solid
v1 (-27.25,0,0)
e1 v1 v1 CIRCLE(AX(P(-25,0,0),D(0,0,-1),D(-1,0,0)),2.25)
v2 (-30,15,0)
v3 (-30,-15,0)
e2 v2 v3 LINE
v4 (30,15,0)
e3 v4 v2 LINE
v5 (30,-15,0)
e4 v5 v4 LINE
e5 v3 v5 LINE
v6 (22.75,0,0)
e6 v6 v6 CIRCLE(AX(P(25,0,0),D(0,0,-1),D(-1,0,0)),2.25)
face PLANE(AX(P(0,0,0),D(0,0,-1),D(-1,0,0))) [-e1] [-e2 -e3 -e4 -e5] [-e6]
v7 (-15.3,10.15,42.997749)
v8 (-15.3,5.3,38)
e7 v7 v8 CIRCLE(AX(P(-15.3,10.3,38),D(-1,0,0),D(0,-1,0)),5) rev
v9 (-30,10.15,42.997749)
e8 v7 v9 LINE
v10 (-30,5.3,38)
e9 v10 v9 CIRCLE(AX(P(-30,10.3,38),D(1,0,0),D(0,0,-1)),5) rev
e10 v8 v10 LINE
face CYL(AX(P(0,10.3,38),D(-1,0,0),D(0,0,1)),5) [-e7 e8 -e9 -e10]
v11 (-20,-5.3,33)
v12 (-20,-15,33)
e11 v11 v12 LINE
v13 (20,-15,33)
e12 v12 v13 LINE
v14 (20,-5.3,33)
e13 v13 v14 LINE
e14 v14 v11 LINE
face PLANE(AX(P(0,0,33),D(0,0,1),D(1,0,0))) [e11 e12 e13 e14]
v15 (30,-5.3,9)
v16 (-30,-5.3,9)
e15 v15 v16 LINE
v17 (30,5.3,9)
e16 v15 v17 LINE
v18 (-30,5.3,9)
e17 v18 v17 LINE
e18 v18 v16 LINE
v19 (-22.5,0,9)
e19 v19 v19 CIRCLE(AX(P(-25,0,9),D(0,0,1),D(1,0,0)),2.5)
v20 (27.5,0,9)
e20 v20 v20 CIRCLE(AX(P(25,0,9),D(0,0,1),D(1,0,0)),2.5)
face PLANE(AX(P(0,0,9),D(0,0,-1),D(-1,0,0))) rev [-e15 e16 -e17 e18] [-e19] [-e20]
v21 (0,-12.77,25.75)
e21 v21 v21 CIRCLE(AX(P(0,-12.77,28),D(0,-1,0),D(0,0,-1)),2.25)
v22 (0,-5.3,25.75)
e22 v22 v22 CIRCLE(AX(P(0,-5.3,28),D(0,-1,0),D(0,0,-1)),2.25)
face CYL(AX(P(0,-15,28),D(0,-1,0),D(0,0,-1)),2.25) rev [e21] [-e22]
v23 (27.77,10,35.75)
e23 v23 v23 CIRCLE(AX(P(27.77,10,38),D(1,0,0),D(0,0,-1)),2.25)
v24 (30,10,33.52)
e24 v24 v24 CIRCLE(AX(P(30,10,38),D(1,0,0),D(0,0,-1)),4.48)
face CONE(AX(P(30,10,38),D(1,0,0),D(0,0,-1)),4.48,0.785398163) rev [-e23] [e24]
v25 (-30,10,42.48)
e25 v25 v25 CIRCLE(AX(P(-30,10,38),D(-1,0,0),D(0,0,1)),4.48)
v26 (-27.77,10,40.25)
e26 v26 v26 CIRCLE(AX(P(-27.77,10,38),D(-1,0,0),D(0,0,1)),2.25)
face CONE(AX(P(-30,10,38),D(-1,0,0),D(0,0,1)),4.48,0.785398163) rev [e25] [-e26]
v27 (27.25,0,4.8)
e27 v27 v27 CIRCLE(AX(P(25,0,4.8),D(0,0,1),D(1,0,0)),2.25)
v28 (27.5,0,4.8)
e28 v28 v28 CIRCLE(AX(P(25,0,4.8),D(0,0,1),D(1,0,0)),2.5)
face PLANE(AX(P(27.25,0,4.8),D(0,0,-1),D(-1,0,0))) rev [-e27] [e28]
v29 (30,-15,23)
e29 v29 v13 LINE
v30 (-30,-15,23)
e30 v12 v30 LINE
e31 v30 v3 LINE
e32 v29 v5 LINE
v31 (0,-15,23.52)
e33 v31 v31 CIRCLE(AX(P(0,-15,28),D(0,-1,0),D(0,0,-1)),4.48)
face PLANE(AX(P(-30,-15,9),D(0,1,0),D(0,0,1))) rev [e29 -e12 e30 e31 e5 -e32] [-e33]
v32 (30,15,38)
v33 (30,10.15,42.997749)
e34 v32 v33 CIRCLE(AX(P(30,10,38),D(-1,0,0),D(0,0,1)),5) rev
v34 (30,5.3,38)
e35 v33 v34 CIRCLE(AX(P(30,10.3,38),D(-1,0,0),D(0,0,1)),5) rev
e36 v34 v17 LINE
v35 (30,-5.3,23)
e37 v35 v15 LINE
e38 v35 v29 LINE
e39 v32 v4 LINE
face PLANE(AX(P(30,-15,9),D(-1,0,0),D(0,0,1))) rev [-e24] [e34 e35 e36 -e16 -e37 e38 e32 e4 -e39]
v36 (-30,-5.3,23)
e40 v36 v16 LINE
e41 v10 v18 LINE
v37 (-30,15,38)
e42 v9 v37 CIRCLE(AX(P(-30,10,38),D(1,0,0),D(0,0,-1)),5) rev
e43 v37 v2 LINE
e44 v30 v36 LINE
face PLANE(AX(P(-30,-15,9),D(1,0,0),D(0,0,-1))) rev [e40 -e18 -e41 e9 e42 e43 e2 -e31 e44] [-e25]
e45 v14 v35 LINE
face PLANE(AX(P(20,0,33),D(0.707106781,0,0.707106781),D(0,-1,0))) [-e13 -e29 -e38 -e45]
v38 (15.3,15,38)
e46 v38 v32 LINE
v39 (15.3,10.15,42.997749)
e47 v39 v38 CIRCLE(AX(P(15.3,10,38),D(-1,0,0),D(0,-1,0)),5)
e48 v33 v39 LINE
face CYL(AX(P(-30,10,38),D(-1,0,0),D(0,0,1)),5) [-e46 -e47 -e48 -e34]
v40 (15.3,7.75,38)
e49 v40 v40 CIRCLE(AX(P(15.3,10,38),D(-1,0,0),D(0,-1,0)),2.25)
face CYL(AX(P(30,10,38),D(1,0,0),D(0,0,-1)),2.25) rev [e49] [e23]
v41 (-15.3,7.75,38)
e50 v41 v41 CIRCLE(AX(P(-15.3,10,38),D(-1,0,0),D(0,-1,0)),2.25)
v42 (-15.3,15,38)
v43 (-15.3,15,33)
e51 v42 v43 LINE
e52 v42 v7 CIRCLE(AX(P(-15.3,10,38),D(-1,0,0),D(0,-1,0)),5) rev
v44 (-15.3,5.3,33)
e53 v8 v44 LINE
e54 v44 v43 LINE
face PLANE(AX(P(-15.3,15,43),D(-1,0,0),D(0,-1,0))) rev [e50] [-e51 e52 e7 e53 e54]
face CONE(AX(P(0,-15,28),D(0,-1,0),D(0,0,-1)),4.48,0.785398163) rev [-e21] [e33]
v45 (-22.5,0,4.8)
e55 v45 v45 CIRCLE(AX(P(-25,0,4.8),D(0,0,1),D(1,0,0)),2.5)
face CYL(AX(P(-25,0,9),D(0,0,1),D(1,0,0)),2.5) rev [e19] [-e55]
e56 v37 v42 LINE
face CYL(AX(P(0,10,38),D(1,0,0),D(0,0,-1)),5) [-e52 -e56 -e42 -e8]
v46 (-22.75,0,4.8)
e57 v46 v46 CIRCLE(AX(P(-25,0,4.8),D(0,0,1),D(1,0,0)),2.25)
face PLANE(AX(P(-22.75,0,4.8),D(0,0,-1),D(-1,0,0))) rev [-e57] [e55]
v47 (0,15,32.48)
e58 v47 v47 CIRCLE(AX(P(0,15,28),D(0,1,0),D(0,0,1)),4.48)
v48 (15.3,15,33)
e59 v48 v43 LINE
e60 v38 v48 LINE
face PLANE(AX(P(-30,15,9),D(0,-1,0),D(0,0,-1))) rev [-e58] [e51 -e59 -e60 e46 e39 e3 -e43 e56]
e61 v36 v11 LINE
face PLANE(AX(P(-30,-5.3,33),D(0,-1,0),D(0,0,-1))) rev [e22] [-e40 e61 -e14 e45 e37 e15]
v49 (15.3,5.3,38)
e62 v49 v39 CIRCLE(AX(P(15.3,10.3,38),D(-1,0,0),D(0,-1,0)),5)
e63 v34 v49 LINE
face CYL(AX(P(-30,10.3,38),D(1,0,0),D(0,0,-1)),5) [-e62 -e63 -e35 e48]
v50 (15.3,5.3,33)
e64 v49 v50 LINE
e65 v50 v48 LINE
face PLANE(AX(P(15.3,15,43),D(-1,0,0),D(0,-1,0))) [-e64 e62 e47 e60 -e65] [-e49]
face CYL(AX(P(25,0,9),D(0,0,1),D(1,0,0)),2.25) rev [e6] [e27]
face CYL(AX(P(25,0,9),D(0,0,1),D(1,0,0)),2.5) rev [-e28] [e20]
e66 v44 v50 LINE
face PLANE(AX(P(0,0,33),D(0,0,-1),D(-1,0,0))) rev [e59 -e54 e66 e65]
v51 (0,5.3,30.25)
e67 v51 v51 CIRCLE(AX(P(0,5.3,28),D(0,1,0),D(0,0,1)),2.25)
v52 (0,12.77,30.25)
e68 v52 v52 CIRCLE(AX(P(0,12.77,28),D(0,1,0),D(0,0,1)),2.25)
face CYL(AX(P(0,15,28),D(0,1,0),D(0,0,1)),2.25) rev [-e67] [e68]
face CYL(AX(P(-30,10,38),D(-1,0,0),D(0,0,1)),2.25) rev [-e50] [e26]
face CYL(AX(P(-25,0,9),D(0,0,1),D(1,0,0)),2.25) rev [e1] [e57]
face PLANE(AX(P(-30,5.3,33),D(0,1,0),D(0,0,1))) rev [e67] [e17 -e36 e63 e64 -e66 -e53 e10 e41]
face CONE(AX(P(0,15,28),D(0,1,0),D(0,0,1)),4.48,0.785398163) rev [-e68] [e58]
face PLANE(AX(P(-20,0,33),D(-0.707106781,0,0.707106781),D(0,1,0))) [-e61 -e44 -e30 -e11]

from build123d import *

# Parameters (mm, degrees)
SKETCH1_W                               = 60
SKETCH1_H                               = 30
BOSS_EXTRUDE1_DEPTH                     = 9
SKETCH2_W                               = 60
SKETCH2_H                               = 9.7
BOSS_EXTRUDE2_DEPTH                     = 24
CHAMFER1_SIZE                           = 10
CSK_FOR_M4_SFHCS1_D                     = 4.5
CSK_FOR_M4_SFHCS1_DEPTH                 = 12
CSK_FOR_M4_SFHCS1_CSINK_D               = 8.96
CSK_FOR_M4_SFHCS1_CSINK_ANGLE           = 90
CSK_FOR_M4_SFHCS1_TIP                   = 1.351936393
CSK_FOR_M4_SFHCS3_D                     = 4.5
CSK_FOR_M4_SFHCS3_DEPTH                 = 12
CSK_FOR_M4_SFHCS3_CSINK_D               = 8.96
CSK_FOR_M4_SFHCS3_CSINK_ANGLE           = 90
CSK_FOR_M4_SFHCS3_TIP                   = 1.351936393
CBORE_FOR_M5_HEX_HEAD_BOLT2_D           = 4.5
CBORE_FOR_M5_HEX_HEAD_BOLT2_DEPTH       = 12
CBORE_FOR_M5_HEX_HEAD_BOLT2_CBORE_D     = 5
CBORE_FOR_M5_HEX_HEAD_BOLT2_CBORE_DEPTH = 4.2
CBORE_FOR_M5_HEX_HEAD_BOLT2_TIP         = 1.351936393
SKETCH9_W                               = 14.7
SKETCH9_H                               = 9.7
BOSS_EXTRUDE3_DEPTH                     = 10
CSK_FOR_M4_SFHCS2_D                     = 4.5
CSK_FOR_M4_SFHCS2_CSINK_D               = 8.96
CSK_FOR_M4_SFHCS2_CSINK_ANGLE           = 90
FILLET1_R                               = 5


with BuildPart() as part:
    # Sketch1 → Boss-Extrude1 (new body)
    with BuildSketch(Plane.XY):
        Rectangle(SKETCH1_W, SKETCH1_H)
    extrude(amount=BOSS_EXTRUDE1_DEPTH)

    # Sketch2 → Boss-Extrude2 (add)
    with BuildSketch(Plane.XY.offset(9)):
        with Locations((0, 10.15)):
            Rectangle(SKETCH2_W, SKETCH2_H)
        with Locations((0, -10.15)):
            Rectangle(SKETCH2_W, SKETCH2_H)
    extrude(amount=BOSS_EXTRUDE2_DEPTH)

    # Chamfer1
    chamfer1_edges = [part.edges().sort_by_distance(p)[0] for p in [
        (30, -10.15, 33),
        (-30, -10.15, 33),
    ]]
    chamfer(chamfer1_edges, length=CHAMFER1_SIZE)

    # CSK for M4 SFHCS1
    with Locations(Plane(origin=(0, -15, 0), x_dir=(-1, 0, 0), z_dir=(0, -1, 0))):
        with Locations((0, -28)):
            CounterSinkHole(CSK_FOR_M4_SFHCS1_D / 2, CSK_FOR_M4_SFHCS1_CSINK_D / 2, depth=CSK_FOR_M4_SFHCS1_DEPTH, counter_sink_angle=CSK_FOR_M4_SFHCS1_CSINK_ANGLE)
            with Locations((0, 0, -(CSK_FOR_M4_SFHCS1_DEPTH + CSK_FOR_M4_SFHCS1_TIP / 2))):  # 118° drill point
                Cone(0, CSK_FOR_M4_SFHCS1_D / 2, CSK_FOR_M4_SFHCS1_TIP, mode=Mode.SUBTRACT)

    # CSK for M4 SFHCS3
    with Locations(Plane(origin=(0, 15, 0), x_dir=(1, 0, 0), z_dir=(0, 1, 0))):
        with Locations((0, -28)):
            CounterSinkHole(CSK_FOR_M4_SFHCS3_D / 2, CSK_FOR_M4_SFHCS3_CSINK_D / 2, depth=CSK_FOR_M4_SFHCS3_DEPTH, counter_sink_angle=CSK_FOR_M4_SFHCS3_CSINK_ANGLE)
            with Locations((0, 0, -(CSK_FOR_M4_SFHCS3_DEPTH + CSK_FOR_M4_SFHCS3_TIP / 2))):  # 118° drill point
                Cone(0, CSK_FOR_M4_SFHCS3_D / 2, CSK_FOR_M4_SFHCS3_TIP, mode=Mode.SUBTRACT)

    # CBORE for M5 Hex Head Bolt2
    with Locations(Plane.XY.offset(9)):
        with Locations((-25, 0), (25, 0)):
            CounterBoreHole(CBORE_FOR_M5_HEX_HEAD_BOLT2_D / 2, CBORE_FOR_M5_HEX_HEAD_BOLT2_CBORE_D / 2, CBORE_FOR_M5_HEX_HEAD_BOLT2_CBORE_DEPTH, depth=CBORE_FOR_M5_HEX_HEAD_BOLT2_DEPTH)
            with Locations((0, 0, -(CBORE_FOR_M5_HEX_HEAD_BOLT2_DEPTH + CBORE_FOR_M5_HEX_HEAD_BOLT2_TIP / 2))):  # 118° drill point
                Cone(0, CBORE_FOR_M5_HEX_HEAD_BOLT2_D / 2, CBORE_FOR_M5_HEX_HEAD_BOLT2_TIP, mode=Mode.SUBTRACT)

    # Sketch9 → Boss-Extrude3 (add)
    with BuildSketch(Plane.XY.offset(33)):
        with Locations((-22.65, 10.15)):
            Rectangle(SKETCH9_W, SKETCH9_H)
    boss_extrude3 = extrude(amount=BOSS_EXTRUDE3_DEPTH)

    # CSK for M4 SFHCS2 (through all)
    with Locations(Plane.ZY.offset(30)):
        with Locations((38, 10)):
            csk_for_m4_sfhcs2 = CounterSinkHole(CSK_FOR_M4_SFHCS2_D / 2, CSK_FOR_M4_SFHCS2_CSINK_D / 2, counter_sink_angle=CSK_FOR_M4_SFHCS2_CSINK_ANGLE)

    # Mirror1: Boss-Extrude3, CSK for M4 SFHCS2 across plane
    add(boss_extrude3.mirror(Plane(origin=(0, 0, 0), x_dir=(0, 0, 1), z_dir=(1, 0, 0))))
    add(csk_for_m4_sfhcs2.mirror(Plane(origin=(0, 0, 0), x_dir=(0, 0, 1), z_dir=(1, 0, 0))), mode=Mode.SUBTRACT)

    # Fillet1
    # the kernel refuses this fillet: 5 mm, written as the material it takes off along each edge
    with BuildSketch(Plane(origin=(2.8, 5.3, 43), x_dir=(0, 0, -1), z_dir=(1, 0, 0)), Plane(origin=(42.5, 15, 43), x_dir=(0, 0, -1), z_dir=(-1, 0, 0))) as fillet1_piece_1:
        with BuildLine():
            CenterArc((FILLET1_R, FILLET1_R), FILLET1_R, 180, 90)
            Line((0, FILLET1_R), (0, 0))
            Line((0, 0), (FILLET1_R, 0))
        make_face()
    extrude(amount=39.7, mode=Mode.SUBTRACT)
    with BuildSketch(Plane(origin=(-2.8, 5.3, 43), x_dir=(0, 0, -1), z_dir=(-1, 0, 0)), Plane(origin=(-42.5, 15, 43), x_dir=(0, 0, -1), z_dir=(1, 0, 0))) as fillet1_piece_2:
        with BuildLine():
            CenterArc((FILLET1_R, -FILLET1_R), FILLET1_R, 90, 90)
            Line((0, -FILLET1_R), (0, 0))
            Line((0, 0), (FILLET1_R, 0))
        make_face()
    extrude(amount=39.7, mode=Mode.SUBTRACT)


solid = part.part
